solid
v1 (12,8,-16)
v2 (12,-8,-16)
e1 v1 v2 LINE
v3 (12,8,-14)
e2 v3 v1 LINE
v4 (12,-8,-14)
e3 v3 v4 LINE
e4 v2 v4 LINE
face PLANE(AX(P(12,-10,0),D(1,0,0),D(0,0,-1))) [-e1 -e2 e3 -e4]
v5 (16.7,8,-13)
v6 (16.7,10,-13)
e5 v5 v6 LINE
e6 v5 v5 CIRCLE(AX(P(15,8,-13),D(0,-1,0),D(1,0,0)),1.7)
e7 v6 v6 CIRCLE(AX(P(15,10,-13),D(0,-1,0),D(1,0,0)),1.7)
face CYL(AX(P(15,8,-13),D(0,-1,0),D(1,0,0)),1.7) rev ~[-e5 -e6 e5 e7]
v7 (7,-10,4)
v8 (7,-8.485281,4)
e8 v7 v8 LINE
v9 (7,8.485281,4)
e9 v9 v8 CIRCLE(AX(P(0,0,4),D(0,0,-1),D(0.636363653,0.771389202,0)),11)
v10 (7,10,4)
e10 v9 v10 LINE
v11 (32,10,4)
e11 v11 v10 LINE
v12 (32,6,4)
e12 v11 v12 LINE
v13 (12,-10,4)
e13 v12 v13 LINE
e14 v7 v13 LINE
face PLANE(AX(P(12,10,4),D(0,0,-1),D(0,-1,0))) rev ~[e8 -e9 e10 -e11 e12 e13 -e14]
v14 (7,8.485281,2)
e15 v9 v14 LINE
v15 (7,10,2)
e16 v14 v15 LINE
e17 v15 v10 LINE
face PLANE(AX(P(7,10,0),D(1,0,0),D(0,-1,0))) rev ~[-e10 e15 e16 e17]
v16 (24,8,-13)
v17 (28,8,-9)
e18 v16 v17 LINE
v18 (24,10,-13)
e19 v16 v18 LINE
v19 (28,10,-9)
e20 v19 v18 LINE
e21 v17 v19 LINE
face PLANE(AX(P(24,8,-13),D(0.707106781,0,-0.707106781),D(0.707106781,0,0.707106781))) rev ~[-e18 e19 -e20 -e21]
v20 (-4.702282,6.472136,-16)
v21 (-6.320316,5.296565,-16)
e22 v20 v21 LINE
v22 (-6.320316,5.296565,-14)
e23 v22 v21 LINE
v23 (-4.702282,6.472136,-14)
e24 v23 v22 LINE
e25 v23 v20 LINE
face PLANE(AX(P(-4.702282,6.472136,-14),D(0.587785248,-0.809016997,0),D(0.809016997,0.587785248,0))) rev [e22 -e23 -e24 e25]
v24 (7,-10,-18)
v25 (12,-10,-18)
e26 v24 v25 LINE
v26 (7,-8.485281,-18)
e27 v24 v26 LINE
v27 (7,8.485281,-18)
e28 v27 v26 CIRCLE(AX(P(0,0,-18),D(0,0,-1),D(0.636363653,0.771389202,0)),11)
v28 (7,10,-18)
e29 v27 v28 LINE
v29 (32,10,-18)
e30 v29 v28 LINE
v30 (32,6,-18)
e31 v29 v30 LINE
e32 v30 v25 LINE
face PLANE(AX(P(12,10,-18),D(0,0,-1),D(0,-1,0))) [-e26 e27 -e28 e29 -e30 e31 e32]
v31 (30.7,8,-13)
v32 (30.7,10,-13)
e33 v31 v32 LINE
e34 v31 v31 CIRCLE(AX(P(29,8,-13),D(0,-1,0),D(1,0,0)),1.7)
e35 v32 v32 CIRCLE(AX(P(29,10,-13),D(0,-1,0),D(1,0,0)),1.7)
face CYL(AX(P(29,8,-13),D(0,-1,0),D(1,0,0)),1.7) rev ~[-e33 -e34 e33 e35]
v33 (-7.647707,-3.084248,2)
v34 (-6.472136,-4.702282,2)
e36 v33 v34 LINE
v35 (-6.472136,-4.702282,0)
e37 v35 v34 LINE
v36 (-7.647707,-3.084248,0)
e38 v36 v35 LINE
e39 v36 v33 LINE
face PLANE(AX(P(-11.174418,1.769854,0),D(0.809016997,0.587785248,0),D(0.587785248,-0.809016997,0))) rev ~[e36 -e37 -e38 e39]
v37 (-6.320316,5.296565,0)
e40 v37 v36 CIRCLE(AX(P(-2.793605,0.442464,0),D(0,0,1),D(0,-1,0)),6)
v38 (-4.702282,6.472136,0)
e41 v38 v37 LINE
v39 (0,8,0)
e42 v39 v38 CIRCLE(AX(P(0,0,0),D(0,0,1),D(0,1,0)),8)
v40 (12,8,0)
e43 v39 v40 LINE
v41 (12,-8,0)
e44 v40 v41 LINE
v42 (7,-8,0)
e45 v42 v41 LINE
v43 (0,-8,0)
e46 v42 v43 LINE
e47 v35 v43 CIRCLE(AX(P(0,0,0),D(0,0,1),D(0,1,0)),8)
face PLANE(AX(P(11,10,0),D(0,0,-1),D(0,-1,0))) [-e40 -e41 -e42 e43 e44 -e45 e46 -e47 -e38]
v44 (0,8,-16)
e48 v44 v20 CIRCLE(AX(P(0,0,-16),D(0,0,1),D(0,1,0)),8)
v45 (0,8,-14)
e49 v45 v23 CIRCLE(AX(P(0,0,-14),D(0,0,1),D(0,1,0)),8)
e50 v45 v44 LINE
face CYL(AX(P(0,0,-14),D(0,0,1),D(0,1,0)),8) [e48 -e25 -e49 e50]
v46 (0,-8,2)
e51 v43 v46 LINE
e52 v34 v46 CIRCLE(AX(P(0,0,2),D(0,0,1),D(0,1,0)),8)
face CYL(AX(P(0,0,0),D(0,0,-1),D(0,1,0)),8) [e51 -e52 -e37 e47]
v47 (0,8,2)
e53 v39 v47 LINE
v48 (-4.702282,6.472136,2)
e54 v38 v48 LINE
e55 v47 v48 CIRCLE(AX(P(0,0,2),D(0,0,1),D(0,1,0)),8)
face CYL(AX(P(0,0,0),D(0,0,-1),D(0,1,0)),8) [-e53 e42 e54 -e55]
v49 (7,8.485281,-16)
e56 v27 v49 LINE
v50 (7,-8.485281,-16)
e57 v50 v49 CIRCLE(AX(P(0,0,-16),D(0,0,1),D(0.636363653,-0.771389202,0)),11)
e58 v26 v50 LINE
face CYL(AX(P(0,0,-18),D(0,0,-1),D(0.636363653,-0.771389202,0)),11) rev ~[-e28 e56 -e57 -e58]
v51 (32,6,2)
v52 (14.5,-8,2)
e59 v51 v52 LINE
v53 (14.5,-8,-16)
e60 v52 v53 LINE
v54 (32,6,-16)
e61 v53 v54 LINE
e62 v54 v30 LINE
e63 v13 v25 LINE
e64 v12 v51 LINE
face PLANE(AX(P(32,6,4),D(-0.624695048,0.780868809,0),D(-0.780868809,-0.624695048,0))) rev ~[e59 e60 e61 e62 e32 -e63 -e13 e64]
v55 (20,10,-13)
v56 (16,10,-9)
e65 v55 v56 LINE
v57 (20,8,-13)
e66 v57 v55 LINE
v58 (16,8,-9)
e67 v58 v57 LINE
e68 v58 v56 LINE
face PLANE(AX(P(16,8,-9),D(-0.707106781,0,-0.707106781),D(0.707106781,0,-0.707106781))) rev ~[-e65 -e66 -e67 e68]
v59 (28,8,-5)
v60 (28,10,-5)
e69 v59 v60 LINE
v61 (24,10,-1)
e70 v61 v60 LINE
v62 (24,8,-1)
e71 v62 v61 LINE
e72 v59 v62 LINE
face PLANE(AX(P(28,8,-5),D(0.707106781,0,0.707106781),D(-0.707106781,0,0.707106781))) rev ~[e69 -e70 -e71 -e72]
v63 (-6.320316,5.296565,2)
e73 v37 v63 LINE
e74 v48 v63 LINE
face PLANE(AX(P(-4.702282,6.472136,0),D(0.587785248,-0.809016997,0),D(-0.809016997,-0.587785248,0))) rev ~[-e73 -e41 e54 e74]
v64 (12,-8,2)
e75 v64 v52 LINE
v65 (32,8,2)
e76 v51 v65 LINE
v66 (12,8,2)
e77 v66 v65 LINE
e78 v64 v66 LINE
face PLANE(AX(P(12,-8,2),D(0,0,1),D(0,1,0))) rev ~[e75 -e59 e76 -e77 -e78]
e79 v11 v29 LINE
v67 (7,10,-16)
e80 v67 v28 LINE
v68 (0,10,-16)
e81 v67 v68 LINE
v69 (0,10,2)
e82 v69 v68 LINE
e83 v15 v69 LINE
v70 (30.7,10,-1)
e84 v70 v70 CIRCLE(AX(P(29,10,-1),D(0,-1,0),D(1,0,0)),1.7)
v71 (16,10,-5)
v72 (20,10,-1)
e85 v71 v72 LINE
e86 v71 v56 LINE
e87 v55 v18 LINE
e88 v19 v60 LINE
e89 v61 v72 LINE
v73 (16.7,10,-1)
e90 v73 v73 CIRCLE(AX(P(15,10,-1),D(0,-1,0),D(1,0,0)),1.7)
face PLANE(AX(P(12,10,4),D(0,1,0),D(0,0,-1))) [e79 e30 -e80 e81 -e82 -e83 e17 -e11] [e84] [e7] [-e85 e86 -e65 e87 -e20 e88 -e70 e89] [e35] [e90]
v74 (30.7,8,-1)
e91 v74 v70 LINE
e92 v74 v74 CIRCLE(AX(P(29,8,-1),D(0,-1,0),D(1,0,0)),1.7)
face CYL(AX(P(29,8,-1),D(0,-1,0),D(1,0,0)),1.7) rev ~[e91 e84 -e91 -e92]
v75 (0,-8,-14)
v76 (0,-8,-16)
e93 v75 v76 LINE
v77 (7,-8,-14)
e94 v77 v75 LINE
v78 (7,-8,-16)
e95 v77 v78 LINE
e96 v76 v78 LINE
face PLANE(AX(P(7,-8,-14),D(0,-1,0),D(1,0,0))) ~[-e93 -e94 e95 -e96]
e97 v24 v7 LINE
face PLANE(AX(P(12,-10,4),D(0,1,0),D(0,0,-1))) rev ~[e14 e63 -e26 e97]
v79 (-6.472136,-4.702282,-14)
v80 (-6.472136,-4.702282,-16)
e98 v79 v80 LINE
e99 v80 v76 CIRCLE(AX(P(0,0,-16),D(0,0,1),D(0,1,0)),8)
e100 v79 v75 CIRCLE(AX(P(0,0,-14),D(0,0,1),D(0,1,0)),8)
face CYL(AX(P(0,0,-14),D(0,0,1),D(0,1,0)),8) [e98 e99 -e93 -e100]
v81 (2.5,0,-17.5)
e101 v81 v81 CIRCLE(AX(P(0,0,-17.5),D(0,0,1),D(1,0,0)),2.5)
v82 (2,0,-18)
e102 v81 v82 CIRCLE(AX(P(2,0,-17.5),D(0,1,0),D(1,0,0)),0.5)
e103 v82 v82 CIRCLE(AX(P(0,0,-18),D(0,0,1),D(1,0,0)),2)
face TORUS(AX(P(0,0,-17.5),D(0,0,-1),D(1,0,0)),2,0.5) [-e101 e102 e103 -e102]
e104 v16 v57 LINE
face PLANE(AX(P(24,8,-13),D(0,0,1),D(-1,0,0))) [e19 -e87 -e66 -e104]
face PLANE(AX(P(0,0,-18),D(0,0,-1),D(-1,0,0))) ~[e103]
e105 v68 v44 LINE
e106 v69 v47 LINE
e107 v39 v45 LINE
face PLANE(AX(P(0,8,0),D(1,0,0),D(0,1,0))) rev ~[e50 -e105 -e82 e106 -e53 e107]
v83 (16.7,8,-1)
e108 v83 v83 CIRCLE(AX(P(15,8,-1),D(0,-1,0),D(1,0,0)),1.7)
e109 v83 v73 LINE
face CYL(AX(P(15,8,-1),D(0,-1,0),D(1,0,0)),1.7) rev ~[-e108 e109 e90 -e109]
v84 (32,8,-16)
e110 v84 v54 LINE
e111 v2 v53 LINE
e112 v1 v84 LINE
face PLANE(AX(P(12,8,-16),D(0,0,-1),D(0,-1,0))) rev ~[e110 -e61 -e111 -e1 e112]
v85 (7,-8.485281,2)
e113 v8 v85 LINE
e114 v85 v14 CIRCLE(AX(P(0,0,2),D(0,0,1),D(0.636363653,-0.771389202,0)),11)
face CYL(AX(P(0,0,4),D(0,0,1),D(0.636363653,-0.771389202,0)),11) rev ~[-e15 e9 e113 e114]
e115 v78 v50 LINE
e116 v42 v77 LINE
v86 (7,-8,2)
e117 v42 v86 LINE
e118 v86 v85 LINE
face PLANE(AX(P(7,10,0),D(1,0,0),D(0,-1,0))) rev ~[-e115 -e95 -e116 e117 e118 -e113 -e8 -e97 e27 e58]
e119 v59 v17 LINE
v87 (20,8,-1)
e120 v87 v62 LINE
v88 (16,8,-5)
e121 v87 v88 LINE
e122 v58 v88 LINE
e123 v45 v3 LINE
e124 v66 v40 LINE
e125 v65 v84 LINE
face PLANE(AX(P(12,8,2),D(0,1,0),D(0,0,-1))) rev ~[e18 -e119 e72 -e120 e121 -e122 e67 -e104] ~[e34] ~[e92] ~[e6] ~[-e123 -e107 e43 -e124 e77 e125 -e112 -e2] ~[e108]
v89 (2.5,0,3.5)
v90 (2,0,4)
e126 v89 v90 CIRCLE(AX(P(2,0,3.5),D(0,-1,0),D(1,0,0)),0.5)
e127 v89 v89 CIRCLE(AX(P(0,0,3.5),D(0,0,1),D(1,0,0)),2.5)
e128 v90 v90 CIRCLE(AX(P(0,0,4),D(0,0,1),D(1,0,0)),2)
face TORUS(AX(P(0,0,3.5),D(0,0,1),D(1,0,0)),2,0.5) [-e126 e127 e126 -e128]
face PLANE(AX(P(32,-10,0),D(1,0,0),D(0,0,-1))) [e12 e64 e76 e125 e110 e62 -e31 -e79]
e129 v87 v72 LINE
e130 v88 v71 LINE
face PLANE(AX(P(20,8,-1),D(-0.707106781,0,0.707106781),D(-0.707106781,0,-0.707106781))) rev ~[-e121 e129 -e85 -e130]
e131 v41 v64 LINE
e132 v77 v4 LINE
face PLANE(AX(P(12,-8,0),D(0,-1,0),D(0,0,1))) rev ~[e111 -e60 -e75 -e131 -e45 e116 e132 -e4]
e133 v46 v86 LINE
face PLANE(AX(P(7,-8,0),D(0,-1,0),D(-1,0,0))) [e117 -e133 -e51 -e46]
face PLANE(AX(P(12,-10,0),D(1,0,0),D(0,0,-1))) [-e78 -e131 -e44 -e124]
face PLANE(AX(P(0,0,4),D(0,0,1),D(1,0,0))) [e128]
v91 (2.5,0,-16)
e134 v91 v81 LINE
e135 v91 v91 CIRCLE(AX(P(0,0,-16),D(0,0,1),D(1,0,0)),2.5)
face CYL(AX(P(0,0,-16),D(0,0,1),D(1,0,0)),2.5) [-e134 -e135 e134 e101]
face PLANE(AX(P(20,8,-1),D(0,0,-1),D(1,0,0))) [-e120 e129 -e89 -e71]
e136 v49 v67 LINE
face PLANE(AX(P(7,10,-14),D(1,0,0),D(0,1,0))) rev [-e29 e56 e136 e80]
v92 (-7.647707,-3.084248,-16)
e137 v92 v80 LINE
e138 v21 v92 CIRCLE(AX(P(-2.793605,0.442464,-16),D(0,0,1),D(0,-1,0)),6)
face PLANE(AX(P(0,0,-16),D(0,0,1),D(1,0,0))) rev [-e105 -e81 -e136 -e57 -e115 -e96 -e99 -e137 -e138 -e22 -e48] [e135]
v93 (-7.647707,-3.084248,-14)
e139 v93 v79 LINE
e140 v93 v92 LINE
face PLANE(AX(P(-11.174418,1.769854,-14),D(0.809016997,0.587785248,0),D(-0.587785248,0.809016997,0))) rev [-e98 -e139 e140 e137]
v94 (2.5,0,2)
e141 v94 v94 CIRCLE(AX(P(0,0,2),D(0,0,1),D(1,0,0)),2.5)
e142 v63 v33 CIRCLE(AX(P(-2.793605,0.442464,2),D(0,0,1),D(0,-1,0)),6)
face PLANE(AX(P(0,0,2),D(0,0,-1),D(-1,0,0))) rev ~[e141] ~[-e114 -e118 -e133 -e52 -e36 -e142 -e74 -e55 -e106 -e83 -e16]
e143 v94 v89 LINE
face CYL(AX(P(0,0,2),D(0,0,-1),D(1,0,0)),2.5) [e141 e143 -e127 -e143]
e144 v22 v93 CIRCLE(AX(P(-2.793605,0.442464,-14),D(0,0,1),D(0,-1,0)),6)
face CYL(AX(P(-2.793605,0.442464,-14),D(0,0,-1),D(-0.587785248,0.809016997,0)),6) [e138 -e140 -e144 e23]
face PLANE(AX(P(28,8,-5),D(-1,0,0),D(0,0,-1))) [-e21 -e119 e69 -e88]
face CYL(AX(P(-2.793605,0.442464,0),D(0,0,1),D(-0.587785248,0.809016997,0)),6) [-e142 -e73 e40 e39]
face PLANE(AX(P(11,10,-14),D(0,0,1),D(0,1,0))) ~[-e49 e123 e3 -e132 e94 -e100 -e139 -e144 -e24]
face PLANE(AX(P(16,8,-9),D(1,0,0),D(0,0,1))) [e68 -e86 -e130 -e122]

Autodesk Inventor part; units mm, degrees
ref_plane "YZ Plane" through (0, 0, 0) normal (1, 0, 0) x (0, 1, 0)
sketch "Sketch1" plane through (0, 0, 0) normal (0, 0, 1) x (1, 0, 0)
  circle A0 centre (0, 0) radius 2.5
  circle A1 centre (20, 0) radius 2.5
  line L0 (7, 10) -> (20, 10)
  line L1 (7, -10) -> (20, -10)
  arc A2 (20, -10) -> (20, 10) centre (20, 0) ccw
  line L2 (7, 10) -> (7, 8)
  line L3 (7, -10) -> (7, -8)
  line L4 (7, 8) -> (0, 8)
  line L5 (7, -8) -> (0, -8)
  arc A3 (0, 8) -> (0, -8) centre (0, 0) ccw
  dimension "d0" = 5
  dimension "d1" = 20
  dimension "d2" = 10
  dimension "d3" = 2
  dimension "d4" = 13
extrude "Extrusion1" add sketch "Sketch1" along normal blind 4
sketch "Sketch2" plane through (0, 0, 4) normal (0, 0, 1) x (1, 0, 0)
  circle A0 centre (0, 0) radius 2.5 projected
  line L0 (7, 8) -> (0, 8) projected
  arc A1 (0, 8) -> (0, -8) centre (0, 0) ccw projected
  line L1 (0, -8) -> (7, -8) projected
  line L2 (7, -10) -> (20, -10) projected
  line L3 (7, 8) -> (7, -8)
  line L4 (7, -8) -> (0, -8)
  line L5 (7, 8) -> (0, 8)
  arc A2 (0, 8) -> (0, -8) centre (0, 0) ccw
extrude "Extrusion2" cut sketch "Sketch2" against normal blind 2
sketch "Sketch3" plane through (0, 0, 0) normal (0, 0, -1) x (-1, 0, 0)
  circle A0 centre (-20, 0) radius 2.5 projected
  circle A1 centre (0, 0) radius 2.5 projected
  line L0 (-7, 10) -> (-20, 10) projected
  arc A2 (-20, 10) -> (-20, -10) centre (-20, 0) ccw projected
  line L1 (-20, -10) -> (-7, -10) projected
  line L2 (-7, 8) -> (-7, 10) projected
  line L3 (-19, 10) -> (-19, 8)
  line L4 (-19, 8) -> (-11, 8)
  line L5 (-11, 8) -> (-11, -8)
  line L6 (-11, -8) -> (-19, -8)
  line L7 (-19, -8) -> (-19, -10)
  point P0 (-7, -8)
  dimension "d9" = 1
  dimension "d10" = 11
extrude "Extrusion3" cut sketch "Sketch3" against normal blind 2 contours L3 L4 L5 L6 L7 L1 A2 L0
sketch "Sketch4" plane through (0, 0, 4) normal (0, 0, 1) x (1, 0, 0)
  line L0 (7, 10) -> (7, -10)
  circle A0 centre (0, 0) radius 2.5
  arc A1 (7, -8.485281) -> (7, 8.485281) centre (0, 0) ccw
  dimension "d15" = 11
extrude "Extrusion4" cut sketch "Sketch4" against normal blind 2 contours A1 L0
sketch "Sketch5" plane through (0, 0, 0) normal (0, 0, -1) x (-1, 0, 0)
  line L0 (0, 8) -> (-7, 8) projected
  line L1 (-7, 10) -> (0, 10)
  line L2 (0, 10) -> (0, 8)
  line L3 (0, 8) -> (-7, 8)
  line L4 (-7, 8) -> (-7, 10)
  arc A0 (0, -8) -> (0, 8) centre (0, 0) ccw projected
extrude "Extrusion5" add sketch "Sketch5" against normal blind 2
sketch "Sketch6" plane through (0, 0, 0) normal (0, 0, -1) x (-1, 0, 0)
  line L0 (0, 10) -> (-19, 10) projected
  line L1 (-19, 8) -> (-20, 8)
  line L2 (-20, 8) -> (-20, 10)
  line L3 (-20, 10) -> (-19, 10)
  line L4 (-19, 10) -> (-19, 8)
  circle A0 centre (-20, 0) radius 2.5 projected
extrude "Extrusion6" add sketch "Sketch6" against normal blind 2 contours L1 L2 L3 L4
sketch "Sketch7" plane through (0, 0, 0) normal (0, 0, -1) x (-1, 0, 0)
  line L0 (-19, -8) -> (-19, -10)
  line L1 (-11, -8) -> (-19, -8)
  line L2 (-17.400642, -8) -> (-19, -9.162001)
  line L3 (-17.400642, -8) -> (-26.805206, 4.944272) construction
  line L4 (-26.805206, 4.944272) -> (-28.404564, 3.782271) construction
  line L5 (-28.404564, 3.782271) -> (-19, -9.162001) construction
  circle A0 centre (-20, 0) radius 2.5
  line L6 (-17.400642, -8) -> (-19, -8)
  line L7 (-19, -8) -> (-19, -9.162001)
  dimension "d21" = 16
  dimension "d22" = 8
  dimension "d23" = 36
extrude "Extrusion7" cut sketch "Sketch7" against normal blind 2 contours L1 L2 L0
sketch "Sketch9" plane through (0, 0, 2) normal (0, 0, 1) x (1, 0, 0)
  circle A0 centre (0, 0) radius 2.5
  arc A1 (11, 0) -> (7, 8.485281) centre (0, 0) ccw
  circle A2 centre (0, 0) radius 2.5
extrude "Extrusion8" add sketch "Sketch9" along normal mid plane 4
fillet "Fillet1" radius 0.5 1 edges at (-2.5, 0, 4)
sketch "Sketch10" plane through (0, 0, 0) normal (0, 0, -1) x (-1, 0, 0)
  arc A0 (0, -8) -> (0, 8) centre (0, 0) ccw
  line L0 (0, 10) -> (-20, 10)
  line L1 (4.702282, 6.472136) -> (11.174418, 1.769854)
  line L2 (11.174418, 1.769854) -> (6.472136, -4.702282)
  dimension "d30" = 144
extrude "Extrusion9" add sketch "Sketch10" against normal blind 2
fillet "Fillet2" radius 6 1 edges at (-11.1744, 1.7699, 1)
ref_plane "Work Plane1" through (11, 0, 4) normal (1, 0, 0) x (0, 1, 0)
split "Split1" plane through (11, 0, 4) removes the side toward (1, 0, 0)
sketch "Sketch11" plane through (11, -10, 0) normal (1, 0, 0) x (0, 0, -1)
  line L0 (0, 20) -> (0, 0) projected
  line L1 (-4, 20) -> (0, 20) projected
  line L2 (-4, 10) -> (-4, 20) projected
  line L3 (-4, 0) -> (-4, 10) projected
  line L4 (0, 0) -> (-4, 0) projected
  point P0 (0, 10)
extrude "Extrusion10" add sketch "Sketch11" along normal blind 1
ref_plane "Work Plane2" through (0, 0, -7) normal (0, 0, -1) x (-1, 0, 0)
mirror "Mirror1" about plane through (0, 0, -7) normal (0, 0, -1)
sketch "Sketch12" plane through (0, 0, 0) normal (0, 0, -1) x (-1, 0, 0)
  line L0 (-12, -10) -> (-7, -10)
  line L1 (-7, -10) -> (-7, -8)
  arc A0 (4.702282, 6.472136) -> (0, 8) centre (0, 0) ccw
  line L2 (0, 8) -> (0, 10)
  line L3 (0, 10) -> (-12, 10)
  line L4 (-12, -10) -> (-12, 10)
  line L5 (0, 8) -> (-12, 8)
  line L6 (-7, -8) -> (-12, -8)
extrude "Extrusion11" add sketch "Sketch12" along normal blind 14
sketch "Sketch13" plane through (12, -10, 0) normal (1, 0, 0) x (0, 0, -1)
  line L0 (0, 18) -> (14, 18) projected
  line L1 (0, 2) -> (14, 2) projected
  line L2 (-4, 0) -> (18, 0) projected
  line L3 (18, 20) -> (18, 0) projected
  line L4 (-4, 20) -> (18, 20) projected
  line L5 (-4, 20) -> (-4, 0) projected
  line L6 (-2, 18) -> (16, 18)
  line L7 (16, 18) -> (16, 2)
  line L8 (16, 2) -> (-2, 2)
  line L9 (-2, 2) -> (-2, 18)
  point P0 (0, 10)
  dimension "d39" = 2
  dimension "d40" = 2
extrude "Extrusion12" add sketch "Sketch13" along normal blind 20
sketch "Sketch17" plane through (0, 0, 4) normal (0, 0, 1) x (1, 0, 0)
  line L0 (7, -10) -> (32, -10) projected
  line L1 (32, 10) -> (32, -10) projected
  line L2 (32, 6) -> (12, -10)
  dimension "d73" = 4
  dimension "d74" = 20
extrude "Extrusion16" cut sketch "Sketch17" against normal blind 22
sketch "Sketch18" plane through (0, 8, 0) normal (0, -1, 0) x (1, 0, 0)
  line L0 (12, -16) -> (32, -16) projected
  line L1 (32, 2) -> (32, -16) projected
  line L2 (12, 2) -> (32, 2) projected
  line L3 (15, -1) -> (29, -1) construction
  line L4 (29, -1) -> (29, -13) construction
  line L5 (29, -13) -> (15, -13) construction
  line L6 (15, -13) -> (15, -1) construction
  circle A0 centre (15, -13) radius 1.7
  circle A1 centre (15, -1) radius 1.7
  circle A2 centre (29, -1) radius 1.7
  circle A3 centre (29, -13) radius 1.7
  line L7 (20, -1) -> (24, -1)
  line L8 (28, -5) -> (28, -9)
  line L9 (24, -13) -> (20, -13)
  line L10 (16, -9) -> (16, -5)
  line L11 (16, -9) -> (20, -13)
  line L12 (24, -13) -> (28, -9)
  line L13 (28, -5) -> (24, -1)
  line L14 (20, -1) -> (16, -5)
  point P0 (16, -7)
  point P1 (15, -7)
  dimension "d77" = 3.4
  dimension "d78" = 45
  dimension "d79" = 4
  dimension "d80" = 3
  dimension "d81" = 3
  dimension "d82" = 3
  dimension "d83" = 14
  dimension "d84" = 1
  dimension "d85" = 1
extrude "Extrusion17" cut sketch "Sketch18" against normal through all
properties part number "y_axis_cable_mount_b" material "ABS Plastic"
